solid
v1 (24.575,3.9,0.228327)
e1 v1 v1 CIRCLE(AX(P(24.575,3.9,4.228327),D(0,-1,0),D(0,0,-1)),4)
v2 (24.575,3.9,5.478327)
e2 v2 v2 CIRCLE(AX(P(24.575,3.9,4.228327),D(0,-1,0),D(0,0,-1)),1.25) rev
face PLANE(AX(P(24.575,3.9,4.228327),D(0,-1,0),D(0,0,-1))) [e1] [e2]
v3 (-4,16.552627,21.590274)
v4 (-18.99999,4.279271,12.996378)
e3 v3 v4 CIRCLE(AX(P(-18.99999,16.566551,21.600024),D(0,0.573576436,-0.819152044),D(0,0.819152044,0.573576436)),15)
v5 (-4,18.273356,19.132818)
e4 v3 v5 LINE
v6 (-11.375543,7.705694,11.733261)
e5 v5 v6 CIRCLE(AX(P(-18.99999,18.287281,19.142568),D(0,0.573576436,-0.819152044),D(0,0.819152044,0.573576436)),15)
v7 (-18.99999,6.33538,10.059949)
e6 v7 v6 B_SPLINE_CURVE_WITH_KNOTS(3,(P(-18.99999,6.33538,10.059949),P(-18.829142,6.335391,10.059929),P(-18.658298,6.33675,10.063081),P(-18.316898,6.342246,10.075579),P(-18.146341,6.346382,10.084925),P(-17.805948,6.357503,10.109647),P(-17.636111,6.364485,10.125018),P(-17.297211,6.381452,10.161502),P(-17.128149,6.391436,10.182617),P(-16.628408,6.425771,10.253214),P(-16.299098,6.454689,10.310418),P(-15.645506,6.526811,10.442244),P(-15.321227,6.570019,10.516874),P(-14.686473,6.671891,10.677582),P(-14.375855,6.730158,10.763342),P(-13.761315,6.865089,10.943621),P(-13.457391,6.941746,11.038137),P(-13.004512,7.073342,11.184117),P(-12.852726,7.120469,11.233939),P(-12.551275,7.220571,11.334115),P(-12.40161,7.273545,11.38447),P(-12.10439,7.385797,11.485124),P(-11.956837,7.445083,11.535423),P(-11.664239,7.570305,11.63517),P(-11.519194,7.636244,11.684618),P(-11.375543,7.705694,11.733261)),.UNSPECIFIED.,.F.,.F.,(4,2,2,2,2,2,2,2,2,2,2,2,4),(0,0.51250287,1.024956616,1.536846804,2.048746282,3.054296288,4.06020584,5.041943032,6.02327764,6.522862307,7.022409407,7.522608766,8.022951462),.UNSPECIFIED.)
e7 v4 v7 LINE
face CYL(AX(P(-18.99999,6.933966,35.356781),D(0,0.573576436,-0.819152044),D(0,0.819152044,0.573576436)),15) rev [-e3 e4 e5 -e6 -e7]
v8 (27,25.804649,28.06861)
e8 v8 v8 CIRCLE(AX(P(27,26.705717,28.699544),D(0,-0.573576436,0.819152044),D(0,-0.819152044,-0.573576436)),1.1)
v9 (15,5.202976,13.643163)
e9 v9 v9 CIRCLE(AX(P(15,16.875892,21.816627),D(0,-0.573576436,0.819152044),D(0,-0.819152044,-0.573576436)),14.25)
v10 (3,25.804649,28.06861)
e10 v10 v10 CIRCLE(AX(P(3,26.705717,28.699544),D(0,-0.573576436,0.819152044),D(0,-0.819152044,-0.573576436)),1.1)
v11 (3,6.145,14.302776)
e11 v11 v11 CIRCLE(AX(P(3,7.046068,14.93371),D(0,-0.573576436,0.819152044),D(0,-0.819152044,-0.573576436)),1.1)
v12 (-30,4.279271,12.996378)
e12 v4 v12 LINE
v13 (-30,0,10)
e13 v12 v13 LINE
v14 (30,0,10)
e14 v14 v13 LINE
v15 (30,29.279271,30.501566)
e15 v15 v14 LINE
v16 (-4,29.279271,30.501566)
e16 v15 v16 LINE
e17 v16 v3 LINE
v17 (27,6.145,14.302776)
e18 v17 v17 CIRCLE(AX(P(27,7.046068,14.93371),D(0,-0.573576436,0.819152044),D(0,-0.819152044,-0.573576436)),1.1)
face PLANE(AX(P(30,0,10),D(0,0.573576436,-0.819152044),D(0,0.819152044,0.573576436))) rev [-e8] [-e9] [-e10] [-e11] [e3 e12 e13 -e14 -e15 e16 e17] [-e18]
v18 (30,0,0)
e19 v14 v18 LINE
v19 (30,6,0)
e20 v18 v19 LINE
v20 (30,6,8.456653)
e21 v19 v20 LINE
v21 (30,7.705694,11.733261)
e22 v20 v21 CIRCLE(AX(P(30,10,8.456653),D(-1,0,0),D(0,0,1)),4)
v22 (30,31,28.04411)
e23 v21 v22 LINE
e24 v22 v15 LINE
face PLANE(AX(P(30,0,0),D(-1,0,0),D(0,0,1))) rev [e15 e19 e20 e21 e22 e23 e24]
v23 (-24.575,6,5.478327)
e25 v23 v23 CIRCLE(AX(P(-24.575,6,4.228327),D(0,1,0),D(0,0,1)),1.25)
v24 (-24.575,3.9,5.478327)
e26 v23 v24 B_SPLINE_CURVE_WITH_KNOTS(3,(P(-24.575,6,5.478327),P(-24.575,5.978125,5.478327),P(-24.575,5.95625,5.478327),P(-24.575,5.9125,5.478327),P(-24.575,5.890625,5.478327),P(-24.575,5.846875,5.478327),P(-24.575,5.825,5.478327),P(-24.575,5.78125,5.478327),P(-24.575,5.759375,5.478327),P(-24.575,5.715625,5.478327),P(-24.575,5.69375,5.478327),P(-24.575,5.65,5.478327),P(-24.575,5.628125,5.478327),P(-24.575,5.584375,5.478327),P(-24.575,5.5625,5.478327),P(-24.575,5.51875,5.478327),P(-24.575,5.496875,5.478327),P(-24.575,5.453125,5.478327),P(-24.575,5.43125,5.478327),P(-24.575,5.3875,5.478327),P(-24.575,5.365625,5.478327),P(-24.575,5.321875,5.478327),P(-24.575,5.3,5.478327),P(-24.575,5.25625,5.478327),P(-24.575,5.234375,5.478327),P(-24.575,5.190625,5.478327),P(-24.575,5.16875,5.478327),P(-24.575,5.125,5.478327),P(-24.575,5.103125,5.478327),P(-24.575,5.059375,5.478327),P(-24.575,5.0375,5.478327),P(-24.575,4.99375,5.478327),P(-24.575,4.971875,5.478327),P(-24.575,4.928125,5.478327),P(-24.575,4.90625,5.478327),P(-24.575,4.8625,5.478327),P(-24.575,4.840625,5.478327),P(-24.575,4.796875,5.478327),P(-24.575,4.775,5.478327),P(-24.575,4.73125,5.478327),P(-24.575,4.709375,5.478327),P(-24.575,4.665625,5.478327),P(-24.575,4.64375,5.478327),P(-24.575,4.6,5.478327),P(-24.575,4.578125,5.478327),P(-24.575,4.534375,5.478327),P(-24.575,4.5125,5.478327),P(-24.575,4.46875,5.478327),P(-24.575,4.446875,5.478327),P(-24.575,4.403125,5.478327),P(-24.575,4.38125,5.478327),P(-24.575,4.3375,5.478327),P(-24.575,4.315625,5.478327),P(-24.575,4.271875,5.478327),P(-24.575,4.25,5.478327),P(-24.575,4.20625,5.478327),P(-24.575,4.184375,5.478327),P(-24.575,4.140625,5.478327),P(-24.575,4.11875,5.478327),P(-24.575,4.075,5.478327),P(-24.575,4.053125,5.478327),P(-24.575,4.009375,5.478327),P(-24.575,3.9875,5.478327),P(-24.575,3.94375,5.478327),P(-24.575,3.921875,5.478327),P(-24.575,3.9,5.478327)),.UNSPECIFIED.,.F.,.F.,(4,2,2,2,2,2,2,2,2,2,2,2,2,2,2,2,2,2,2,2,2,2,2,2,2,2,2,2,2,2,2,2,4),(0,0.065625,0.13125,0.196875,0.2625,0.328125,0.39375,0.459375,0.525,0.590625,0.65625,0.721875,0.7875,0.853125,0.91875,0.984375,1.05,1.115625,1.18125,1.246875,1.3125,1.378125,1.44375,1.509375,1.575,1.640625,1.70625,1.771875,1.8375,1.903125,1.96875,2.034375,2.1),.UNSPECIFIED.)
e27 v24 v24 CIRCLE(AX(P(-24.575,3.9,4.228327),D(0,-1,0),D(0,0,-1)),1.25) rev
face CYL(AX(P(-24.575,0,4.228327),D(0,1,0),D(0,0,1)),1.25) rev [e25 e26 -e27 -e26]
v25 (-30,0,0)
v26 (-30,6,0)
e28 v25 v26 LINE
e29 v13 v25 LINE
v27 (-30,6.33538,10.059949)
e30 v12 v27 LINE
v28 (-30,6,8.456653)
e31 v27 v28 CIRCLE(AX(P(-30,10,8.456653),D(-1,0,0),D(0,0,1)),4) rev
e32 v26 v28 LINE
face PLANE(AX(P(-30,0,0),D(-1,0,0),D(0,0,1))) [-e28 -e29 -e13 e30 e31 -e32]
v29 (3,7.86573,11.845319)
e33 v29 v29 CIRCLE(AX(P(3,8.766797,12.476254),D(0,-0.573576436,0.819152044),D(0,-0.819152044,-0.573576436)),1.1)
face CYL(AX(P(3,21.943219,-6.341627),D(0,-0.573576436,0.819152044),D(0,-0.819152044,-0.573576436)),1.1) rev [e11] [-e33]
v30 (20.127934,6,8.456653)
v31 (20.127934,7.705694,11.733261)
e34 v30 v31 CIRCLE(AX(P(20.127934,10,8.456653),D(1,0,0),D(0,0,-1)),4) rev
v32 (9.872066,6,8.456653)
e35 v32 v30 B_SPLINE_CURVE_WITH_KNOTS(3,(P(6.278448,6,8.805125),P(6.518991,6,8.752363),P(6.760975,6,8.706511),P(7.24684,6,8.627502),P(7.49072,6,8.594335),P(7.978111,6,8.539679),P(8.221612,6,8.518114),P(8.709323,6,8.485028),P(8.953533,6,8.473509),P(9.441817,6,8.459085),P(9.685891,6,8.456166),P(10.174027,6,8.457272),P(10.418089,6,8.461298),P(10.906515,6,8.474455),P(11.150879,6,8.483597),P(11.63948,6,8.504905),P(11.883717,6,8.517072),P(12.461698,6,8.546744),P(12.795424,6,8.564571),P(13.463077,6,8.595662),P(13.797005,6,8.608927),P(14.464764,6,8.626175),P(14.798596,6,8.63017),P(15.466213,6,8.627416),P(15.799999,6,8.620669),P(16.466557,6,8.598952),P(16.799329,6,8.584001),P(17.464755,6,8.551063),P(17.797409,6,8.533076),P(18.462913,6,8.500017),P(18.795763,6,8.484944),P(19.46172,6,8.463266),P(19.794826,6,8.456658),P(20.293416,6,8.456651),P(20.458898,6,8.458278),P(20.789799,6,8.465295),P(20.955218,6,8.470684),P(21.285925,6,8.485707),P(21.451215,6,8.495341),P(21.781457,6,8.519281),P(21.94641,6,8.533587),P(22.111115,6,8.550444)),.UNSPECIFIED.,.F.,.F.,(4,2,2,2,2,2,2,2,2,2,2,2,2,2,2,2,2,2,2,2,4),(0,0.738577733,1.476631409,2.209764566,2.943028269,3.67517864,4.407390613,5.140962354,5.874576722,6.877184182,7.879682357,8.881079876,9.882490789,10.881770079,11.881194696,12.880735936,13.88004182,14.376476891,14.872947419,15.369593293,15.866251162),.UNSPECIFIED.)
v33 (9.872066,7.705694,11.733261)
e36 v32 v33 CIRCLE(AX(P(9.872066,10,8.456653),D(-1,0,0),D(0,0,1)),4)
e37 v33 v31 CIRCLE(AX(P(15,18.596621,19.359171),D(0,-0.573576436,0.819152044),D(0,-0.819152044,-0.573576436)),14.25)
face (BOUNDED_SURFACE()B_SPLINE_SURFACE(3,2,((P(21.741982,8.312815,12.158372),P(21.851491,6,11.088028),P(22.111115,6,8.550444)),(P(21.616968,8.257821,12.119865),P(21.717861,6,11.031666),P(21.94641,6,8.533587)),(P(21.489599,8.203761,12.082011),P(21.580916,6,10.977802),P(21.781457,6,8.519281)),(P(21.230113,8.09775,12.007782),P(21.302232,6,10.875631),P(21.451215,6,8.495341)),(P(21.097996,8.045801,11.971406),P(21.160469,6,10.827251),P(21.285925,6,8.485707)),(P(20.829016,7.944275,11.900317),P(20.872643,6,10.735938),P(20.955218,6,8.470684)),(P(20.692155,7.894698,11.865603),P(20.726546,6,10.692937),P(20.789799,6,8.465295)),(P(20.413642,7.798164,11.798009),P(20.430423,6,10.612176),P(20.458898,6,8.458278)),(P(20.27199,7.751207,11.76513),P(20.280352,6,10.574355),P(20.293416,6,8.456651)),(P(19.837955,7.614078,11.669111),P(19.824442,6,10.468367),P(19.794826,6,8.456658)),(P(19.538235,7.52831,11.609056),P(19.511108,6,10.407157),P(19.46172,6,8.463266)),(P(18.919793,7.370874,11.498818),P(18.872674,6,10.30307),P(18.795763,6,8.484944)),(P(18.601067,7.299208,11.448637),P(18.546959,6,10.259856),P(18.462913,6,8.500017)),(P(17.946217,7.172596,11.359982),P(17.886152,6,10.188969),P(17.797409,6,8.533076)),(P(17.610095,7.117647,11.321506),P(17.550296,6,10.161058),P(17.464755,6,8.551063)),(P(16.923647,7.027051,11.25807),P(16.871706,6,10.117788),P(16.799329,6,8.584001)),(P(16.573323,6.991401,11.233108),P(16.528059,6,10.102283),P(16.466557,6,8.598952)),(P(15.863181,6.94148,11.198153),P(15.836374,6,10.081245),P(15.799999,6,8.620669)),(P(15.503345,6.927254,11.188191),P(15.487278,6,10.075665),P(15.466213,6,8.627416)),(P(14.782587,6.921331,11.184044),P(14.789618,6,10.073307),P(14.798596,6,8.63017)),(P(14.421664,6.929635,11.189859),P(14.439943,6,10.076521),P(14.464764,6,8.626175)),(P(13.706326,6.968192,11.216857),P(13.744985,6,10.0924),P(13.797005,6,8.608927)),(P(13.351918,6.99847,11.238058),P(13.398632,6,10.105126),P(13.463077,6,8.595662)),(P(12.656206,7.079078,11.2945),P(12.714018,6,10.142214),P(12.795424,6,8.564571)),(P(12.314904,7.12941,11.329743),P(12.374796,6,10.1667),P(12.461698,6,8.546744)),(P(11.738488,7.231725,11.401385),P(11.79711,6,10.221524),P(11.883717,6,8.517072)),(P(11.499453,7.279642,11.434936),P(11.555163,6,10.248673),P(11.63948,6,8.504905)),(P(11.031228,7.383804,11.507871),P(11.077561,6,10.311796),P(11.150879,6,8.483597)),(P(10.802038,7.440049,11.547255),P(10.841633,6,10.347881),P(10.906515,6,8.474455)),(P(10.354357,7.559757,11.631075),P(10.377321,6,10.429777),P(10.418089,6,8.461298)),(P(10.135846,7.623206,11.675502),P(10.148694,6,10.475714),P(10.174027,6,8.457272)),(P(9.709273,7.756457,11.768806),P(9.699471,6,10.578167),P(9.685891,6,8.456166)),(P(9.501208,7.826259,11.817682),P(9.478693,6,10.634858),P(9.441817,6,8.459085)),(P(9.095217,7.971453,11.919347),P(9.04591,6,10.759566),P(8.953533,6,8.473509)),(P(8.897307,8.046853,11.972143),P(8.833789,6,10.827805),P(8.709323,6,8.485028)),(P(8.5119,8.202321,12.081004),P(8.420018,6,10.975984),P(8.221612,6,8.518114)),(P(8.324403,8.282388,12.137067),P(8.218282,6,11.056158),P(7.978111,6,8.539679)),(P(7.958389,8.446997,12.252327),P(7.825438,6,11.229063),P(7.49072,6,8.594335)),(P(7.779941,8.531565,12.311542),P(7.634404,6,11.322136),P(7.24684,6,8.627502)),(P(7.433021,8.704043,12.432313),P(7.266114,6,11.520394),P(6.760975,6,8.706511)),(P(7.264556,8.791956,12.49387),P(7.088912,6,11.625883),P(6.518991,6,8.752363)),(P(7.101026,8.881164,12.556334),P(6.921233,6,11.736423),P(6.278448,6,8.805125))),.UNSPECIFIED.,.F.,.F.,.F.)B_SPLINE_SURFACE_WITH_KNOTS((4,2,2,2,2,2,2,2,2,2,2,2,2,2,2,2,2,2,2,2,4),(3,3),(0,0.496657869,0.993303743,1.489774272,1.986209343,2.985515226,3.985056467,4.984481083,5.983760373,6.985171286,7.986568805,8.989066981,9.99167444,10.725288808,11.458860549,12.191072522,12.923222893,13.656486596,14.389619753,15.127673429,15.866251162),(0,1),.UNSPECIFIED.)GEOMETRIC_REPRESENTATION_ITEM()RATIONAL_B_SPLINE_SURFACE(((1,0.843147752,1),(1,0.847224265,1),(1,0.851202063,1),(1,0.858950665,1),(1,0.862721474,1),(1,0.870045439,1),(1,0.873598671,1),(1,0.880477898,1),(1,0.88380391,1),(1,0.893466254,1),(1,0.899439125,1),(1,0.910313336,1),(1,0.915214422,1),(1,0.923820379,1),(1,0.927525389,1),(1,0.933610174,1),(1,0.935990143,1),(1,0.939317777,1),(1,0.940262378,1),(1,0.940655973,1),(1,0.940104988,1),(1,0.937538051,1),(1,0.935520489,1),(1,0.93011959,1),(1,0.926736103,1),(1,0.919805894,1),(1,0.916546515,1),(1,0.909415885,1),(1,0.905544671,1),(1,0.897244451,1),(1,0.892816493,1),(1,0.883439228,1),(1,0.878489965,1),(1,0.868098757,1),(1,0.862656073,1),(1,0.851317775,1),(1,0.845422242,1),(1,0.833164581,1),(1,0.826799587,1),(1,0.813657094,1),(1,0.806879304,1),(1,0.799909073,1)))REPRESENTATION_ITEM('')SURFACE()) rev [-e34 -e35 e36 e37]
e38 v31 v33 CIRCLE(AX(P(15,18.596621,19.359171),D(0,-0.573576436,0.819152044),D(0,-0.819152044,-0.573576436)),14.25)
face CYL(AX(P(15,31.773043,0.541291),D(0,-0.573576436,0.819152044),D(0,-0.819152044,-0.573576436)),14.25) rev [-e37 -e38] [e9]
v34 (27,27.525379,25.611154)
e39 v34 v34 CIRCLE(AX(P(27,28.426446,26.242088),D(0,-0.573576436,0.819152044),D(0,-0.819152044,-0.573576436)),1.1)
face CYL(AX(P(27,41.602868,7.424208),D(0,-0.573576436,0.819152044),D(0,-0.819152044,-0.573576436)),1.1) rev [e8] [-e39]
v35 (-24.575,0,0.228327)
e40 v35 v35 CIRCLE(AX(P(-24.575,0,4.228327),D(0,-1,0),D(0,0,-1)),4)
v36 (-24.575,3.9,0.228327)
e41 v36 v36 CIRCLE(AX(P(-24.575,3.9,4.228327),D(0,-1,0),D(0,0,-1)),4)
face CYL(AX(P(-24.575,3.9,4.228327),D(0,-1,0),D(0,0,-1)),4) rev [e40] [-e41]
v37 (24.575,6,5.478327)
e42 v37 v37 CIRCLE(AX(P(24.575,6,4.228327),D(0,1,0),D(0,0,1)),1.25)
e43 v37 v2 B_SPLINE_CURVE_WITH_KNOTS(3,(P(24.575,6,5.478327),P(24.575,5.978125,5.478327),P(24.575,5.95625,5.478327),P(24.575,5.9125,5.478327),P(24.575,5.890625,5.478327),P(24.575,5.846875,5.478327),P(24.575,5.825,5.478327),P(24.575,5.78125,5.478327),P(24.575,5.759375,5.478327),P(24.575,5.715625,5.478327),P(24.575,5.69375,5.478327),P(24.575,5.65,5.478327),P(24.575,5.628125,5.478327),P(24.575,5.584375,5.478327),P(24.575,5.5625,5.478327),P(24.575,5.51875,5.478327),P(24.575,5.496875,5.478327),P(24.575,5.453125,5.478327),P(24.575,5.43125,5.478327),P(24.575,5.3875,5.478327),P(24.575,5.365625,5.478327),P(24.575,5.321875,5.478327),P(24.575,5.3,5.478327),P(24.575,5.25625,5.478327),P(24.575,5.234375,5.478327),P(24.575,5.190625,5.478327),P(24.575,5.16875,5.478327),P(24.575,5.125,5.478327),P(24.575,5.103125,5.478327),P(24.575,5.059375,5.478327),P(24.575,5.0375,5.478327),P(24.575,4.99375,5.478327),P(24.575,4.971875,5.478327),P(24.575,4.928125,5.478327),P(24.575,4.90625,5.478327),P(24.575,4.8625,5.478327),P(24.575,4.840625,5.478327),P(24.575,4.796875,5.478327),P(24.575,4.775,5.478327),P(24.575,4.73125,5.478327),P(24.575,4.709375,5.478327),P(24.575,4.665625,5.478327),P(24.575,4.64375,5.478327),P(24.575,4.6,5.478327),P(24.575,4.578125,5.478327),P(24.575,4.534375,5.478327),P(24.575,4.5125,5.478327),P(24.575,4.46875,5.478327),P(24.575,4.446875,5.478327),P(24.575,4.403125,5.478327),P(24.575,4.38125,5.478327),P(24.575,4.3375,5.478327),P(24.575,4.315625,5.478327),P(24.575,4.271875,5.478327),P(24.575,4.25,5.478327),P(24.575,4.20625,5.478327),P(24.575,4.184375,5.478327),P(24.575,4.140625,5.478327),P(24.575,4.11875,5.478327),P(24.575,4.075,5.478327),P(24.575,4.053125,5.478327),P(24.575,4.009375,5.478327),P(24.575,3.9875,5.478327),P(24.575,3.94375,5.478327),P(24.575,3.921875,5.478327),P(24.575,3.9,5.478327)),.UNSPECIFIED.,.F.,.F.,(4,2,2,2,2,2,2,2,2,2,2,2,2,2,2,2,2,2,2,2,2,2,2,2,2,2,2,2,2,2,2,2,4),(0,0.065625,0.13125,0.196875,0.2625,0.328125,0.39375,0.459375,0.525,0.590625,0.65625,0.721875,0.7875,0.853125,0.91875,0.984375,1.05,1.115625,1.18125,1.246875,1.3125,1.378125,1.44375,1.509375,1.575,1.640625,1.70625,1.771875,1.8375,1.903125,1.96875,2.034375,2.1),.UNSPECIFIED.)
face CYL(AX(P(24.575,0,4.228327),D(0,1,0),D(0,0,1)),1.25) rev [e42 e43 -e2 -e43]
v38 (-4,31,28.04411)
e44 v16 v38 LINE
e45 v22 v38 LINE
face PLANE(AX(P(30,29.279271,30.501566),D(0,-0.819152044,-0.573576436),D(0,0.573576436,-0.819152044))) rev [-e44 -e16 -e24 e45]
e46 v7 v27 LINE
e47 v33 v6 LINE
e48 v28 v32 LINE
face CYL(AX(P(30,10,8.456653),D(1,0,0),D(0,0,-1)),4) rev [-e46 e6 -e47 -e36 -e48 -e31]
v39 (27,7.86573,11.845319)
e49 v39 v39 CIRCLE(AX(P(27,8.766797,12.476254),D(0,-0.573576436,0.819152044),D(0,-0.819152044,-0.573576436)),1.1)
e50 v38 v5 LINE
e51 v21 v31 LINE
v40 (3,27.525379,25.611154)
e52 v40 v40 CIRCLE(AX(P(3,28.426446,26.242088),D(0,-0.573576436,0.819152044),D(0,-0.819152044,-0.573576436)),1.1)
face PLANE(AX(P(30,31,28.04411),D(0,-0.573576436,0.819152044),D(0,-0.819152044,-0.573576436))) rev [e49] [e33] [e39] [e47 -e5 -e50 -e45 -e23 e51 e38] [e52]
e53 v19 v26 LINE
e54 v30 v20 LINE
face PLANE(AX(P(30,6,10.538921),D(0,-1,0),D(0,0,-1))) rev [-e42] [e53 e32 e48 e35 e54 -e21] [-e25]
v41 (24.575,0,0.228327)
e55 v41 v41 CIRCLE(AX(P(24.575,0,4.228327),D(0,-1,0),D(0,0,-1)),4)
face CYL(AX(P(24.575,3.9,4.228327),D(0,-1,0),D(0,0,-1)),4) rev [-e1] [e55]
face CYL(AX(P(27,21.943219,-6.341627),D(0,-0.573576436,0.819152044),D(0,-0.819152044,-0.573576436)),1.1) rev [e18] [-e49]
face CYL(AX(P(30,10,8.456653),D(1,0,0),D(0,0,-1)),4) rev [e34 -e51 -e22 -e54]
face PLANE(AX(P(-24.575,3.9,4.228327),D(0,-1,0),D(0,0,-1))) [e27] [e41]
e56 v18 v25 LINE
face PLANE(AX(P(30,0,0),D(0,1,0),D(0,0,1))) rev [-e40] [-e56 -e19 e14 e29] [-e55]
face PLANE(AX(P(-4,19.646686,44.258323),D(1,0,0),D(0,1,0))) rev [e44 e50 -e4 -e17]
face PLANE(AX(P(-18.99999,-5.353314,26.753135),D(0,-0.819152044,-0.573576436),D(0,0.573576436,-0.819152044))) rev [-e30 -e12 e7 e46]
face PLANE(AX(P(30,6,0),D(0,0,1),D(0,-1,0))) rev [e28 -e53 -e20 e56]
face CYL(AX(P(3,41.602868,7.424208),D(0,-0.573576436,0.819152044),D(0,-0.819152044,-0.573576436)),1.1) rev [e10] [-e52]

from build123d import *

# Parameters (mm, degrees)
BOSS_EXTRUDE1_DEPTH = 30
SKETCH3_R           = 1.1
SKETCH3_R_2         = 14.25
CUT_EXTRUDE1_DEPTH  = 53.348964562
FILLET2_R           = 4
CUT_EXTRUDE2_DEPTH  = 53.378356962
SKETCH5_R           = 1.25
CUT_EXTRUDE3_DEPTH  = 50.551443345
SKETCH6_R           = 4
CUT_EXTRUDE4_DEPTH  = 3.9
CUT_EXTRUDE5_START  = -5.191520443
CUT_EXTRUDE5_DEPTH  = 0.58471683


# Read off the part's stored shape, not the designer's step: Cut-Extrude5
with BuildPart() as part:
    # Sketch1 → Boss-Extrude1 (new, symmetric)
    with BuildSketch(Plane(origin=(0, 0, 0), x_dir=(0, 0, -1), z_dir=(1, 0, 0))):
        Polygon((0, 0), (-10, 0), (-30.501566051, 29.279270691), (-28.044109918, 31), (-10.538921463, 6), (0, 6), align=None)
    extrude(amount=BOSS_EXTRUDE1_DEPTH, both=True)

    # Sketch3 → Cut-Extrude1 (cut, through all)
    with BuildSketch(Plane(origin=(0, -4.698463104, 6.710100717), x_dir=(1, 0, 0), z_dir=(0, -0.5735764363510448, 0.8191520442889928))):
        with Locations(Location((3, 38.337424669, 0), (0, 0, 270))):
            Circle(SKETCH3_R)
        with Locations(Location((27, 38.337424669, 0), (0, 0, 270))):
            Circle(SKETCH3_R)
        with Locations(Location((27, 14.337424669, 0), (0, 0, 270))):
            Circle(SKETCH3_R)
        with Locations(Location((3, 14.337424669, 0), (0, 0, 270))):
            Circle(SKETCH3_R)
        with Locations(Location((15, 26.337424669, 0), (0, 0, 270))):
            Circle(SKETCH3_R_2)
    extrude(amount=-CUT_EXTRUDE1_DEPTH, mode=Mode.SUBTRACT)

    # Fillet2
    fillet2_edges = [part.edges().sort_by_distance(p)[0] for p in [
        (0, 6, 10.538921463),
    ]]
    fillet(fillet2_edges, radius=FILLET2_R)

    # Sketch4 → Cut-Extrude2 (cut, through all)
    with BuildSketch(Plane(origin=(0, -2.977733795, 4.252644584), x_dir=(-1, 0, 0), z_dir=(0, 0.5735764363510438, -0.8191520442889935))):
        with BuildLine():
            Line((4, 41.479154), (4, 25.942790865))
            ThreePointArc((4, 25.942790865), (8.399400202, 15.347179418), (18.999990368, 10.959789281))
            Line((18.999990368, 10.959789281), (30, 10.959789281))
            Line((30, 10.959789281), (30, 41.479154))
            Line((30, 41.479154), (4, 41.479154))
        make_face()
    extrude(amount=-CUT_EXTRUDE2_DEPTH, mode=Mode.SUBTRACT)

    # Sketch5 → Cut-Extrude3 (cut, through all)
    with BuildSketch(Plane(origin=(0, 6, 0), x_dir=(1, 0, 0), z_dir=(0, 1, 0))):
        with Locations(Location((-24.575, -4.22832663, 0), (0, 0, 270))):
            Circle(SKETCH5_R)
        with Locations(Location((24.575, -4.22832663, 0), (0, 0, 270))):
            Circle(SKETCH5_R)
    extrude(amount=-CUT_EXTRUDE3_DEPTH, mode=Mode.SUBTRACT)

    # Sketch6 → Cut-Extrude4 (cut)
    with BuildSketch(Plane.XZ):
        with Locations(Location((-24.575, 4.22832663, 0), (0, 0, 270))):
            Circle(SKETCH6_R)
        with Locations(Location((24.575, 4.22832663, 0), (0, 0, 270))):
            Circle(SKETCH6_R)
    extrude(amount=-CUT_EXTRUDE4_DEPTH, mode=Mode.SUBTRACT)

    # Cut-Extrude5 outline → Cut-Extrude5 (cut)
    with BuildSketch(Plane(origin=(0, 0, 0), x_dir=(1, 0, 0), z_dir=(0, 0.5735764363510437, -0.8191520442889935)).offset(CUT_EXTRUDE5_START)):
        with BuildLine():
            ThreePointArc((-10, -13.959782058), (-14.256579589, -11.729537907), (-18.999990368, -10.959789281))
            Line((-18.999990368, -10.959789281), (-31, -10.959789281))
            Line((-31, -10.959789281), (-31, -15))
            Line((-31, -15), (-10, -15))
            Line((-10, -15), (-10, -13.959782058))
        make_face()
    extrude(amount=CUT_EXTRUDE5_DEPTH, mode=Mode.SUBTRACT)


solid = part.part
